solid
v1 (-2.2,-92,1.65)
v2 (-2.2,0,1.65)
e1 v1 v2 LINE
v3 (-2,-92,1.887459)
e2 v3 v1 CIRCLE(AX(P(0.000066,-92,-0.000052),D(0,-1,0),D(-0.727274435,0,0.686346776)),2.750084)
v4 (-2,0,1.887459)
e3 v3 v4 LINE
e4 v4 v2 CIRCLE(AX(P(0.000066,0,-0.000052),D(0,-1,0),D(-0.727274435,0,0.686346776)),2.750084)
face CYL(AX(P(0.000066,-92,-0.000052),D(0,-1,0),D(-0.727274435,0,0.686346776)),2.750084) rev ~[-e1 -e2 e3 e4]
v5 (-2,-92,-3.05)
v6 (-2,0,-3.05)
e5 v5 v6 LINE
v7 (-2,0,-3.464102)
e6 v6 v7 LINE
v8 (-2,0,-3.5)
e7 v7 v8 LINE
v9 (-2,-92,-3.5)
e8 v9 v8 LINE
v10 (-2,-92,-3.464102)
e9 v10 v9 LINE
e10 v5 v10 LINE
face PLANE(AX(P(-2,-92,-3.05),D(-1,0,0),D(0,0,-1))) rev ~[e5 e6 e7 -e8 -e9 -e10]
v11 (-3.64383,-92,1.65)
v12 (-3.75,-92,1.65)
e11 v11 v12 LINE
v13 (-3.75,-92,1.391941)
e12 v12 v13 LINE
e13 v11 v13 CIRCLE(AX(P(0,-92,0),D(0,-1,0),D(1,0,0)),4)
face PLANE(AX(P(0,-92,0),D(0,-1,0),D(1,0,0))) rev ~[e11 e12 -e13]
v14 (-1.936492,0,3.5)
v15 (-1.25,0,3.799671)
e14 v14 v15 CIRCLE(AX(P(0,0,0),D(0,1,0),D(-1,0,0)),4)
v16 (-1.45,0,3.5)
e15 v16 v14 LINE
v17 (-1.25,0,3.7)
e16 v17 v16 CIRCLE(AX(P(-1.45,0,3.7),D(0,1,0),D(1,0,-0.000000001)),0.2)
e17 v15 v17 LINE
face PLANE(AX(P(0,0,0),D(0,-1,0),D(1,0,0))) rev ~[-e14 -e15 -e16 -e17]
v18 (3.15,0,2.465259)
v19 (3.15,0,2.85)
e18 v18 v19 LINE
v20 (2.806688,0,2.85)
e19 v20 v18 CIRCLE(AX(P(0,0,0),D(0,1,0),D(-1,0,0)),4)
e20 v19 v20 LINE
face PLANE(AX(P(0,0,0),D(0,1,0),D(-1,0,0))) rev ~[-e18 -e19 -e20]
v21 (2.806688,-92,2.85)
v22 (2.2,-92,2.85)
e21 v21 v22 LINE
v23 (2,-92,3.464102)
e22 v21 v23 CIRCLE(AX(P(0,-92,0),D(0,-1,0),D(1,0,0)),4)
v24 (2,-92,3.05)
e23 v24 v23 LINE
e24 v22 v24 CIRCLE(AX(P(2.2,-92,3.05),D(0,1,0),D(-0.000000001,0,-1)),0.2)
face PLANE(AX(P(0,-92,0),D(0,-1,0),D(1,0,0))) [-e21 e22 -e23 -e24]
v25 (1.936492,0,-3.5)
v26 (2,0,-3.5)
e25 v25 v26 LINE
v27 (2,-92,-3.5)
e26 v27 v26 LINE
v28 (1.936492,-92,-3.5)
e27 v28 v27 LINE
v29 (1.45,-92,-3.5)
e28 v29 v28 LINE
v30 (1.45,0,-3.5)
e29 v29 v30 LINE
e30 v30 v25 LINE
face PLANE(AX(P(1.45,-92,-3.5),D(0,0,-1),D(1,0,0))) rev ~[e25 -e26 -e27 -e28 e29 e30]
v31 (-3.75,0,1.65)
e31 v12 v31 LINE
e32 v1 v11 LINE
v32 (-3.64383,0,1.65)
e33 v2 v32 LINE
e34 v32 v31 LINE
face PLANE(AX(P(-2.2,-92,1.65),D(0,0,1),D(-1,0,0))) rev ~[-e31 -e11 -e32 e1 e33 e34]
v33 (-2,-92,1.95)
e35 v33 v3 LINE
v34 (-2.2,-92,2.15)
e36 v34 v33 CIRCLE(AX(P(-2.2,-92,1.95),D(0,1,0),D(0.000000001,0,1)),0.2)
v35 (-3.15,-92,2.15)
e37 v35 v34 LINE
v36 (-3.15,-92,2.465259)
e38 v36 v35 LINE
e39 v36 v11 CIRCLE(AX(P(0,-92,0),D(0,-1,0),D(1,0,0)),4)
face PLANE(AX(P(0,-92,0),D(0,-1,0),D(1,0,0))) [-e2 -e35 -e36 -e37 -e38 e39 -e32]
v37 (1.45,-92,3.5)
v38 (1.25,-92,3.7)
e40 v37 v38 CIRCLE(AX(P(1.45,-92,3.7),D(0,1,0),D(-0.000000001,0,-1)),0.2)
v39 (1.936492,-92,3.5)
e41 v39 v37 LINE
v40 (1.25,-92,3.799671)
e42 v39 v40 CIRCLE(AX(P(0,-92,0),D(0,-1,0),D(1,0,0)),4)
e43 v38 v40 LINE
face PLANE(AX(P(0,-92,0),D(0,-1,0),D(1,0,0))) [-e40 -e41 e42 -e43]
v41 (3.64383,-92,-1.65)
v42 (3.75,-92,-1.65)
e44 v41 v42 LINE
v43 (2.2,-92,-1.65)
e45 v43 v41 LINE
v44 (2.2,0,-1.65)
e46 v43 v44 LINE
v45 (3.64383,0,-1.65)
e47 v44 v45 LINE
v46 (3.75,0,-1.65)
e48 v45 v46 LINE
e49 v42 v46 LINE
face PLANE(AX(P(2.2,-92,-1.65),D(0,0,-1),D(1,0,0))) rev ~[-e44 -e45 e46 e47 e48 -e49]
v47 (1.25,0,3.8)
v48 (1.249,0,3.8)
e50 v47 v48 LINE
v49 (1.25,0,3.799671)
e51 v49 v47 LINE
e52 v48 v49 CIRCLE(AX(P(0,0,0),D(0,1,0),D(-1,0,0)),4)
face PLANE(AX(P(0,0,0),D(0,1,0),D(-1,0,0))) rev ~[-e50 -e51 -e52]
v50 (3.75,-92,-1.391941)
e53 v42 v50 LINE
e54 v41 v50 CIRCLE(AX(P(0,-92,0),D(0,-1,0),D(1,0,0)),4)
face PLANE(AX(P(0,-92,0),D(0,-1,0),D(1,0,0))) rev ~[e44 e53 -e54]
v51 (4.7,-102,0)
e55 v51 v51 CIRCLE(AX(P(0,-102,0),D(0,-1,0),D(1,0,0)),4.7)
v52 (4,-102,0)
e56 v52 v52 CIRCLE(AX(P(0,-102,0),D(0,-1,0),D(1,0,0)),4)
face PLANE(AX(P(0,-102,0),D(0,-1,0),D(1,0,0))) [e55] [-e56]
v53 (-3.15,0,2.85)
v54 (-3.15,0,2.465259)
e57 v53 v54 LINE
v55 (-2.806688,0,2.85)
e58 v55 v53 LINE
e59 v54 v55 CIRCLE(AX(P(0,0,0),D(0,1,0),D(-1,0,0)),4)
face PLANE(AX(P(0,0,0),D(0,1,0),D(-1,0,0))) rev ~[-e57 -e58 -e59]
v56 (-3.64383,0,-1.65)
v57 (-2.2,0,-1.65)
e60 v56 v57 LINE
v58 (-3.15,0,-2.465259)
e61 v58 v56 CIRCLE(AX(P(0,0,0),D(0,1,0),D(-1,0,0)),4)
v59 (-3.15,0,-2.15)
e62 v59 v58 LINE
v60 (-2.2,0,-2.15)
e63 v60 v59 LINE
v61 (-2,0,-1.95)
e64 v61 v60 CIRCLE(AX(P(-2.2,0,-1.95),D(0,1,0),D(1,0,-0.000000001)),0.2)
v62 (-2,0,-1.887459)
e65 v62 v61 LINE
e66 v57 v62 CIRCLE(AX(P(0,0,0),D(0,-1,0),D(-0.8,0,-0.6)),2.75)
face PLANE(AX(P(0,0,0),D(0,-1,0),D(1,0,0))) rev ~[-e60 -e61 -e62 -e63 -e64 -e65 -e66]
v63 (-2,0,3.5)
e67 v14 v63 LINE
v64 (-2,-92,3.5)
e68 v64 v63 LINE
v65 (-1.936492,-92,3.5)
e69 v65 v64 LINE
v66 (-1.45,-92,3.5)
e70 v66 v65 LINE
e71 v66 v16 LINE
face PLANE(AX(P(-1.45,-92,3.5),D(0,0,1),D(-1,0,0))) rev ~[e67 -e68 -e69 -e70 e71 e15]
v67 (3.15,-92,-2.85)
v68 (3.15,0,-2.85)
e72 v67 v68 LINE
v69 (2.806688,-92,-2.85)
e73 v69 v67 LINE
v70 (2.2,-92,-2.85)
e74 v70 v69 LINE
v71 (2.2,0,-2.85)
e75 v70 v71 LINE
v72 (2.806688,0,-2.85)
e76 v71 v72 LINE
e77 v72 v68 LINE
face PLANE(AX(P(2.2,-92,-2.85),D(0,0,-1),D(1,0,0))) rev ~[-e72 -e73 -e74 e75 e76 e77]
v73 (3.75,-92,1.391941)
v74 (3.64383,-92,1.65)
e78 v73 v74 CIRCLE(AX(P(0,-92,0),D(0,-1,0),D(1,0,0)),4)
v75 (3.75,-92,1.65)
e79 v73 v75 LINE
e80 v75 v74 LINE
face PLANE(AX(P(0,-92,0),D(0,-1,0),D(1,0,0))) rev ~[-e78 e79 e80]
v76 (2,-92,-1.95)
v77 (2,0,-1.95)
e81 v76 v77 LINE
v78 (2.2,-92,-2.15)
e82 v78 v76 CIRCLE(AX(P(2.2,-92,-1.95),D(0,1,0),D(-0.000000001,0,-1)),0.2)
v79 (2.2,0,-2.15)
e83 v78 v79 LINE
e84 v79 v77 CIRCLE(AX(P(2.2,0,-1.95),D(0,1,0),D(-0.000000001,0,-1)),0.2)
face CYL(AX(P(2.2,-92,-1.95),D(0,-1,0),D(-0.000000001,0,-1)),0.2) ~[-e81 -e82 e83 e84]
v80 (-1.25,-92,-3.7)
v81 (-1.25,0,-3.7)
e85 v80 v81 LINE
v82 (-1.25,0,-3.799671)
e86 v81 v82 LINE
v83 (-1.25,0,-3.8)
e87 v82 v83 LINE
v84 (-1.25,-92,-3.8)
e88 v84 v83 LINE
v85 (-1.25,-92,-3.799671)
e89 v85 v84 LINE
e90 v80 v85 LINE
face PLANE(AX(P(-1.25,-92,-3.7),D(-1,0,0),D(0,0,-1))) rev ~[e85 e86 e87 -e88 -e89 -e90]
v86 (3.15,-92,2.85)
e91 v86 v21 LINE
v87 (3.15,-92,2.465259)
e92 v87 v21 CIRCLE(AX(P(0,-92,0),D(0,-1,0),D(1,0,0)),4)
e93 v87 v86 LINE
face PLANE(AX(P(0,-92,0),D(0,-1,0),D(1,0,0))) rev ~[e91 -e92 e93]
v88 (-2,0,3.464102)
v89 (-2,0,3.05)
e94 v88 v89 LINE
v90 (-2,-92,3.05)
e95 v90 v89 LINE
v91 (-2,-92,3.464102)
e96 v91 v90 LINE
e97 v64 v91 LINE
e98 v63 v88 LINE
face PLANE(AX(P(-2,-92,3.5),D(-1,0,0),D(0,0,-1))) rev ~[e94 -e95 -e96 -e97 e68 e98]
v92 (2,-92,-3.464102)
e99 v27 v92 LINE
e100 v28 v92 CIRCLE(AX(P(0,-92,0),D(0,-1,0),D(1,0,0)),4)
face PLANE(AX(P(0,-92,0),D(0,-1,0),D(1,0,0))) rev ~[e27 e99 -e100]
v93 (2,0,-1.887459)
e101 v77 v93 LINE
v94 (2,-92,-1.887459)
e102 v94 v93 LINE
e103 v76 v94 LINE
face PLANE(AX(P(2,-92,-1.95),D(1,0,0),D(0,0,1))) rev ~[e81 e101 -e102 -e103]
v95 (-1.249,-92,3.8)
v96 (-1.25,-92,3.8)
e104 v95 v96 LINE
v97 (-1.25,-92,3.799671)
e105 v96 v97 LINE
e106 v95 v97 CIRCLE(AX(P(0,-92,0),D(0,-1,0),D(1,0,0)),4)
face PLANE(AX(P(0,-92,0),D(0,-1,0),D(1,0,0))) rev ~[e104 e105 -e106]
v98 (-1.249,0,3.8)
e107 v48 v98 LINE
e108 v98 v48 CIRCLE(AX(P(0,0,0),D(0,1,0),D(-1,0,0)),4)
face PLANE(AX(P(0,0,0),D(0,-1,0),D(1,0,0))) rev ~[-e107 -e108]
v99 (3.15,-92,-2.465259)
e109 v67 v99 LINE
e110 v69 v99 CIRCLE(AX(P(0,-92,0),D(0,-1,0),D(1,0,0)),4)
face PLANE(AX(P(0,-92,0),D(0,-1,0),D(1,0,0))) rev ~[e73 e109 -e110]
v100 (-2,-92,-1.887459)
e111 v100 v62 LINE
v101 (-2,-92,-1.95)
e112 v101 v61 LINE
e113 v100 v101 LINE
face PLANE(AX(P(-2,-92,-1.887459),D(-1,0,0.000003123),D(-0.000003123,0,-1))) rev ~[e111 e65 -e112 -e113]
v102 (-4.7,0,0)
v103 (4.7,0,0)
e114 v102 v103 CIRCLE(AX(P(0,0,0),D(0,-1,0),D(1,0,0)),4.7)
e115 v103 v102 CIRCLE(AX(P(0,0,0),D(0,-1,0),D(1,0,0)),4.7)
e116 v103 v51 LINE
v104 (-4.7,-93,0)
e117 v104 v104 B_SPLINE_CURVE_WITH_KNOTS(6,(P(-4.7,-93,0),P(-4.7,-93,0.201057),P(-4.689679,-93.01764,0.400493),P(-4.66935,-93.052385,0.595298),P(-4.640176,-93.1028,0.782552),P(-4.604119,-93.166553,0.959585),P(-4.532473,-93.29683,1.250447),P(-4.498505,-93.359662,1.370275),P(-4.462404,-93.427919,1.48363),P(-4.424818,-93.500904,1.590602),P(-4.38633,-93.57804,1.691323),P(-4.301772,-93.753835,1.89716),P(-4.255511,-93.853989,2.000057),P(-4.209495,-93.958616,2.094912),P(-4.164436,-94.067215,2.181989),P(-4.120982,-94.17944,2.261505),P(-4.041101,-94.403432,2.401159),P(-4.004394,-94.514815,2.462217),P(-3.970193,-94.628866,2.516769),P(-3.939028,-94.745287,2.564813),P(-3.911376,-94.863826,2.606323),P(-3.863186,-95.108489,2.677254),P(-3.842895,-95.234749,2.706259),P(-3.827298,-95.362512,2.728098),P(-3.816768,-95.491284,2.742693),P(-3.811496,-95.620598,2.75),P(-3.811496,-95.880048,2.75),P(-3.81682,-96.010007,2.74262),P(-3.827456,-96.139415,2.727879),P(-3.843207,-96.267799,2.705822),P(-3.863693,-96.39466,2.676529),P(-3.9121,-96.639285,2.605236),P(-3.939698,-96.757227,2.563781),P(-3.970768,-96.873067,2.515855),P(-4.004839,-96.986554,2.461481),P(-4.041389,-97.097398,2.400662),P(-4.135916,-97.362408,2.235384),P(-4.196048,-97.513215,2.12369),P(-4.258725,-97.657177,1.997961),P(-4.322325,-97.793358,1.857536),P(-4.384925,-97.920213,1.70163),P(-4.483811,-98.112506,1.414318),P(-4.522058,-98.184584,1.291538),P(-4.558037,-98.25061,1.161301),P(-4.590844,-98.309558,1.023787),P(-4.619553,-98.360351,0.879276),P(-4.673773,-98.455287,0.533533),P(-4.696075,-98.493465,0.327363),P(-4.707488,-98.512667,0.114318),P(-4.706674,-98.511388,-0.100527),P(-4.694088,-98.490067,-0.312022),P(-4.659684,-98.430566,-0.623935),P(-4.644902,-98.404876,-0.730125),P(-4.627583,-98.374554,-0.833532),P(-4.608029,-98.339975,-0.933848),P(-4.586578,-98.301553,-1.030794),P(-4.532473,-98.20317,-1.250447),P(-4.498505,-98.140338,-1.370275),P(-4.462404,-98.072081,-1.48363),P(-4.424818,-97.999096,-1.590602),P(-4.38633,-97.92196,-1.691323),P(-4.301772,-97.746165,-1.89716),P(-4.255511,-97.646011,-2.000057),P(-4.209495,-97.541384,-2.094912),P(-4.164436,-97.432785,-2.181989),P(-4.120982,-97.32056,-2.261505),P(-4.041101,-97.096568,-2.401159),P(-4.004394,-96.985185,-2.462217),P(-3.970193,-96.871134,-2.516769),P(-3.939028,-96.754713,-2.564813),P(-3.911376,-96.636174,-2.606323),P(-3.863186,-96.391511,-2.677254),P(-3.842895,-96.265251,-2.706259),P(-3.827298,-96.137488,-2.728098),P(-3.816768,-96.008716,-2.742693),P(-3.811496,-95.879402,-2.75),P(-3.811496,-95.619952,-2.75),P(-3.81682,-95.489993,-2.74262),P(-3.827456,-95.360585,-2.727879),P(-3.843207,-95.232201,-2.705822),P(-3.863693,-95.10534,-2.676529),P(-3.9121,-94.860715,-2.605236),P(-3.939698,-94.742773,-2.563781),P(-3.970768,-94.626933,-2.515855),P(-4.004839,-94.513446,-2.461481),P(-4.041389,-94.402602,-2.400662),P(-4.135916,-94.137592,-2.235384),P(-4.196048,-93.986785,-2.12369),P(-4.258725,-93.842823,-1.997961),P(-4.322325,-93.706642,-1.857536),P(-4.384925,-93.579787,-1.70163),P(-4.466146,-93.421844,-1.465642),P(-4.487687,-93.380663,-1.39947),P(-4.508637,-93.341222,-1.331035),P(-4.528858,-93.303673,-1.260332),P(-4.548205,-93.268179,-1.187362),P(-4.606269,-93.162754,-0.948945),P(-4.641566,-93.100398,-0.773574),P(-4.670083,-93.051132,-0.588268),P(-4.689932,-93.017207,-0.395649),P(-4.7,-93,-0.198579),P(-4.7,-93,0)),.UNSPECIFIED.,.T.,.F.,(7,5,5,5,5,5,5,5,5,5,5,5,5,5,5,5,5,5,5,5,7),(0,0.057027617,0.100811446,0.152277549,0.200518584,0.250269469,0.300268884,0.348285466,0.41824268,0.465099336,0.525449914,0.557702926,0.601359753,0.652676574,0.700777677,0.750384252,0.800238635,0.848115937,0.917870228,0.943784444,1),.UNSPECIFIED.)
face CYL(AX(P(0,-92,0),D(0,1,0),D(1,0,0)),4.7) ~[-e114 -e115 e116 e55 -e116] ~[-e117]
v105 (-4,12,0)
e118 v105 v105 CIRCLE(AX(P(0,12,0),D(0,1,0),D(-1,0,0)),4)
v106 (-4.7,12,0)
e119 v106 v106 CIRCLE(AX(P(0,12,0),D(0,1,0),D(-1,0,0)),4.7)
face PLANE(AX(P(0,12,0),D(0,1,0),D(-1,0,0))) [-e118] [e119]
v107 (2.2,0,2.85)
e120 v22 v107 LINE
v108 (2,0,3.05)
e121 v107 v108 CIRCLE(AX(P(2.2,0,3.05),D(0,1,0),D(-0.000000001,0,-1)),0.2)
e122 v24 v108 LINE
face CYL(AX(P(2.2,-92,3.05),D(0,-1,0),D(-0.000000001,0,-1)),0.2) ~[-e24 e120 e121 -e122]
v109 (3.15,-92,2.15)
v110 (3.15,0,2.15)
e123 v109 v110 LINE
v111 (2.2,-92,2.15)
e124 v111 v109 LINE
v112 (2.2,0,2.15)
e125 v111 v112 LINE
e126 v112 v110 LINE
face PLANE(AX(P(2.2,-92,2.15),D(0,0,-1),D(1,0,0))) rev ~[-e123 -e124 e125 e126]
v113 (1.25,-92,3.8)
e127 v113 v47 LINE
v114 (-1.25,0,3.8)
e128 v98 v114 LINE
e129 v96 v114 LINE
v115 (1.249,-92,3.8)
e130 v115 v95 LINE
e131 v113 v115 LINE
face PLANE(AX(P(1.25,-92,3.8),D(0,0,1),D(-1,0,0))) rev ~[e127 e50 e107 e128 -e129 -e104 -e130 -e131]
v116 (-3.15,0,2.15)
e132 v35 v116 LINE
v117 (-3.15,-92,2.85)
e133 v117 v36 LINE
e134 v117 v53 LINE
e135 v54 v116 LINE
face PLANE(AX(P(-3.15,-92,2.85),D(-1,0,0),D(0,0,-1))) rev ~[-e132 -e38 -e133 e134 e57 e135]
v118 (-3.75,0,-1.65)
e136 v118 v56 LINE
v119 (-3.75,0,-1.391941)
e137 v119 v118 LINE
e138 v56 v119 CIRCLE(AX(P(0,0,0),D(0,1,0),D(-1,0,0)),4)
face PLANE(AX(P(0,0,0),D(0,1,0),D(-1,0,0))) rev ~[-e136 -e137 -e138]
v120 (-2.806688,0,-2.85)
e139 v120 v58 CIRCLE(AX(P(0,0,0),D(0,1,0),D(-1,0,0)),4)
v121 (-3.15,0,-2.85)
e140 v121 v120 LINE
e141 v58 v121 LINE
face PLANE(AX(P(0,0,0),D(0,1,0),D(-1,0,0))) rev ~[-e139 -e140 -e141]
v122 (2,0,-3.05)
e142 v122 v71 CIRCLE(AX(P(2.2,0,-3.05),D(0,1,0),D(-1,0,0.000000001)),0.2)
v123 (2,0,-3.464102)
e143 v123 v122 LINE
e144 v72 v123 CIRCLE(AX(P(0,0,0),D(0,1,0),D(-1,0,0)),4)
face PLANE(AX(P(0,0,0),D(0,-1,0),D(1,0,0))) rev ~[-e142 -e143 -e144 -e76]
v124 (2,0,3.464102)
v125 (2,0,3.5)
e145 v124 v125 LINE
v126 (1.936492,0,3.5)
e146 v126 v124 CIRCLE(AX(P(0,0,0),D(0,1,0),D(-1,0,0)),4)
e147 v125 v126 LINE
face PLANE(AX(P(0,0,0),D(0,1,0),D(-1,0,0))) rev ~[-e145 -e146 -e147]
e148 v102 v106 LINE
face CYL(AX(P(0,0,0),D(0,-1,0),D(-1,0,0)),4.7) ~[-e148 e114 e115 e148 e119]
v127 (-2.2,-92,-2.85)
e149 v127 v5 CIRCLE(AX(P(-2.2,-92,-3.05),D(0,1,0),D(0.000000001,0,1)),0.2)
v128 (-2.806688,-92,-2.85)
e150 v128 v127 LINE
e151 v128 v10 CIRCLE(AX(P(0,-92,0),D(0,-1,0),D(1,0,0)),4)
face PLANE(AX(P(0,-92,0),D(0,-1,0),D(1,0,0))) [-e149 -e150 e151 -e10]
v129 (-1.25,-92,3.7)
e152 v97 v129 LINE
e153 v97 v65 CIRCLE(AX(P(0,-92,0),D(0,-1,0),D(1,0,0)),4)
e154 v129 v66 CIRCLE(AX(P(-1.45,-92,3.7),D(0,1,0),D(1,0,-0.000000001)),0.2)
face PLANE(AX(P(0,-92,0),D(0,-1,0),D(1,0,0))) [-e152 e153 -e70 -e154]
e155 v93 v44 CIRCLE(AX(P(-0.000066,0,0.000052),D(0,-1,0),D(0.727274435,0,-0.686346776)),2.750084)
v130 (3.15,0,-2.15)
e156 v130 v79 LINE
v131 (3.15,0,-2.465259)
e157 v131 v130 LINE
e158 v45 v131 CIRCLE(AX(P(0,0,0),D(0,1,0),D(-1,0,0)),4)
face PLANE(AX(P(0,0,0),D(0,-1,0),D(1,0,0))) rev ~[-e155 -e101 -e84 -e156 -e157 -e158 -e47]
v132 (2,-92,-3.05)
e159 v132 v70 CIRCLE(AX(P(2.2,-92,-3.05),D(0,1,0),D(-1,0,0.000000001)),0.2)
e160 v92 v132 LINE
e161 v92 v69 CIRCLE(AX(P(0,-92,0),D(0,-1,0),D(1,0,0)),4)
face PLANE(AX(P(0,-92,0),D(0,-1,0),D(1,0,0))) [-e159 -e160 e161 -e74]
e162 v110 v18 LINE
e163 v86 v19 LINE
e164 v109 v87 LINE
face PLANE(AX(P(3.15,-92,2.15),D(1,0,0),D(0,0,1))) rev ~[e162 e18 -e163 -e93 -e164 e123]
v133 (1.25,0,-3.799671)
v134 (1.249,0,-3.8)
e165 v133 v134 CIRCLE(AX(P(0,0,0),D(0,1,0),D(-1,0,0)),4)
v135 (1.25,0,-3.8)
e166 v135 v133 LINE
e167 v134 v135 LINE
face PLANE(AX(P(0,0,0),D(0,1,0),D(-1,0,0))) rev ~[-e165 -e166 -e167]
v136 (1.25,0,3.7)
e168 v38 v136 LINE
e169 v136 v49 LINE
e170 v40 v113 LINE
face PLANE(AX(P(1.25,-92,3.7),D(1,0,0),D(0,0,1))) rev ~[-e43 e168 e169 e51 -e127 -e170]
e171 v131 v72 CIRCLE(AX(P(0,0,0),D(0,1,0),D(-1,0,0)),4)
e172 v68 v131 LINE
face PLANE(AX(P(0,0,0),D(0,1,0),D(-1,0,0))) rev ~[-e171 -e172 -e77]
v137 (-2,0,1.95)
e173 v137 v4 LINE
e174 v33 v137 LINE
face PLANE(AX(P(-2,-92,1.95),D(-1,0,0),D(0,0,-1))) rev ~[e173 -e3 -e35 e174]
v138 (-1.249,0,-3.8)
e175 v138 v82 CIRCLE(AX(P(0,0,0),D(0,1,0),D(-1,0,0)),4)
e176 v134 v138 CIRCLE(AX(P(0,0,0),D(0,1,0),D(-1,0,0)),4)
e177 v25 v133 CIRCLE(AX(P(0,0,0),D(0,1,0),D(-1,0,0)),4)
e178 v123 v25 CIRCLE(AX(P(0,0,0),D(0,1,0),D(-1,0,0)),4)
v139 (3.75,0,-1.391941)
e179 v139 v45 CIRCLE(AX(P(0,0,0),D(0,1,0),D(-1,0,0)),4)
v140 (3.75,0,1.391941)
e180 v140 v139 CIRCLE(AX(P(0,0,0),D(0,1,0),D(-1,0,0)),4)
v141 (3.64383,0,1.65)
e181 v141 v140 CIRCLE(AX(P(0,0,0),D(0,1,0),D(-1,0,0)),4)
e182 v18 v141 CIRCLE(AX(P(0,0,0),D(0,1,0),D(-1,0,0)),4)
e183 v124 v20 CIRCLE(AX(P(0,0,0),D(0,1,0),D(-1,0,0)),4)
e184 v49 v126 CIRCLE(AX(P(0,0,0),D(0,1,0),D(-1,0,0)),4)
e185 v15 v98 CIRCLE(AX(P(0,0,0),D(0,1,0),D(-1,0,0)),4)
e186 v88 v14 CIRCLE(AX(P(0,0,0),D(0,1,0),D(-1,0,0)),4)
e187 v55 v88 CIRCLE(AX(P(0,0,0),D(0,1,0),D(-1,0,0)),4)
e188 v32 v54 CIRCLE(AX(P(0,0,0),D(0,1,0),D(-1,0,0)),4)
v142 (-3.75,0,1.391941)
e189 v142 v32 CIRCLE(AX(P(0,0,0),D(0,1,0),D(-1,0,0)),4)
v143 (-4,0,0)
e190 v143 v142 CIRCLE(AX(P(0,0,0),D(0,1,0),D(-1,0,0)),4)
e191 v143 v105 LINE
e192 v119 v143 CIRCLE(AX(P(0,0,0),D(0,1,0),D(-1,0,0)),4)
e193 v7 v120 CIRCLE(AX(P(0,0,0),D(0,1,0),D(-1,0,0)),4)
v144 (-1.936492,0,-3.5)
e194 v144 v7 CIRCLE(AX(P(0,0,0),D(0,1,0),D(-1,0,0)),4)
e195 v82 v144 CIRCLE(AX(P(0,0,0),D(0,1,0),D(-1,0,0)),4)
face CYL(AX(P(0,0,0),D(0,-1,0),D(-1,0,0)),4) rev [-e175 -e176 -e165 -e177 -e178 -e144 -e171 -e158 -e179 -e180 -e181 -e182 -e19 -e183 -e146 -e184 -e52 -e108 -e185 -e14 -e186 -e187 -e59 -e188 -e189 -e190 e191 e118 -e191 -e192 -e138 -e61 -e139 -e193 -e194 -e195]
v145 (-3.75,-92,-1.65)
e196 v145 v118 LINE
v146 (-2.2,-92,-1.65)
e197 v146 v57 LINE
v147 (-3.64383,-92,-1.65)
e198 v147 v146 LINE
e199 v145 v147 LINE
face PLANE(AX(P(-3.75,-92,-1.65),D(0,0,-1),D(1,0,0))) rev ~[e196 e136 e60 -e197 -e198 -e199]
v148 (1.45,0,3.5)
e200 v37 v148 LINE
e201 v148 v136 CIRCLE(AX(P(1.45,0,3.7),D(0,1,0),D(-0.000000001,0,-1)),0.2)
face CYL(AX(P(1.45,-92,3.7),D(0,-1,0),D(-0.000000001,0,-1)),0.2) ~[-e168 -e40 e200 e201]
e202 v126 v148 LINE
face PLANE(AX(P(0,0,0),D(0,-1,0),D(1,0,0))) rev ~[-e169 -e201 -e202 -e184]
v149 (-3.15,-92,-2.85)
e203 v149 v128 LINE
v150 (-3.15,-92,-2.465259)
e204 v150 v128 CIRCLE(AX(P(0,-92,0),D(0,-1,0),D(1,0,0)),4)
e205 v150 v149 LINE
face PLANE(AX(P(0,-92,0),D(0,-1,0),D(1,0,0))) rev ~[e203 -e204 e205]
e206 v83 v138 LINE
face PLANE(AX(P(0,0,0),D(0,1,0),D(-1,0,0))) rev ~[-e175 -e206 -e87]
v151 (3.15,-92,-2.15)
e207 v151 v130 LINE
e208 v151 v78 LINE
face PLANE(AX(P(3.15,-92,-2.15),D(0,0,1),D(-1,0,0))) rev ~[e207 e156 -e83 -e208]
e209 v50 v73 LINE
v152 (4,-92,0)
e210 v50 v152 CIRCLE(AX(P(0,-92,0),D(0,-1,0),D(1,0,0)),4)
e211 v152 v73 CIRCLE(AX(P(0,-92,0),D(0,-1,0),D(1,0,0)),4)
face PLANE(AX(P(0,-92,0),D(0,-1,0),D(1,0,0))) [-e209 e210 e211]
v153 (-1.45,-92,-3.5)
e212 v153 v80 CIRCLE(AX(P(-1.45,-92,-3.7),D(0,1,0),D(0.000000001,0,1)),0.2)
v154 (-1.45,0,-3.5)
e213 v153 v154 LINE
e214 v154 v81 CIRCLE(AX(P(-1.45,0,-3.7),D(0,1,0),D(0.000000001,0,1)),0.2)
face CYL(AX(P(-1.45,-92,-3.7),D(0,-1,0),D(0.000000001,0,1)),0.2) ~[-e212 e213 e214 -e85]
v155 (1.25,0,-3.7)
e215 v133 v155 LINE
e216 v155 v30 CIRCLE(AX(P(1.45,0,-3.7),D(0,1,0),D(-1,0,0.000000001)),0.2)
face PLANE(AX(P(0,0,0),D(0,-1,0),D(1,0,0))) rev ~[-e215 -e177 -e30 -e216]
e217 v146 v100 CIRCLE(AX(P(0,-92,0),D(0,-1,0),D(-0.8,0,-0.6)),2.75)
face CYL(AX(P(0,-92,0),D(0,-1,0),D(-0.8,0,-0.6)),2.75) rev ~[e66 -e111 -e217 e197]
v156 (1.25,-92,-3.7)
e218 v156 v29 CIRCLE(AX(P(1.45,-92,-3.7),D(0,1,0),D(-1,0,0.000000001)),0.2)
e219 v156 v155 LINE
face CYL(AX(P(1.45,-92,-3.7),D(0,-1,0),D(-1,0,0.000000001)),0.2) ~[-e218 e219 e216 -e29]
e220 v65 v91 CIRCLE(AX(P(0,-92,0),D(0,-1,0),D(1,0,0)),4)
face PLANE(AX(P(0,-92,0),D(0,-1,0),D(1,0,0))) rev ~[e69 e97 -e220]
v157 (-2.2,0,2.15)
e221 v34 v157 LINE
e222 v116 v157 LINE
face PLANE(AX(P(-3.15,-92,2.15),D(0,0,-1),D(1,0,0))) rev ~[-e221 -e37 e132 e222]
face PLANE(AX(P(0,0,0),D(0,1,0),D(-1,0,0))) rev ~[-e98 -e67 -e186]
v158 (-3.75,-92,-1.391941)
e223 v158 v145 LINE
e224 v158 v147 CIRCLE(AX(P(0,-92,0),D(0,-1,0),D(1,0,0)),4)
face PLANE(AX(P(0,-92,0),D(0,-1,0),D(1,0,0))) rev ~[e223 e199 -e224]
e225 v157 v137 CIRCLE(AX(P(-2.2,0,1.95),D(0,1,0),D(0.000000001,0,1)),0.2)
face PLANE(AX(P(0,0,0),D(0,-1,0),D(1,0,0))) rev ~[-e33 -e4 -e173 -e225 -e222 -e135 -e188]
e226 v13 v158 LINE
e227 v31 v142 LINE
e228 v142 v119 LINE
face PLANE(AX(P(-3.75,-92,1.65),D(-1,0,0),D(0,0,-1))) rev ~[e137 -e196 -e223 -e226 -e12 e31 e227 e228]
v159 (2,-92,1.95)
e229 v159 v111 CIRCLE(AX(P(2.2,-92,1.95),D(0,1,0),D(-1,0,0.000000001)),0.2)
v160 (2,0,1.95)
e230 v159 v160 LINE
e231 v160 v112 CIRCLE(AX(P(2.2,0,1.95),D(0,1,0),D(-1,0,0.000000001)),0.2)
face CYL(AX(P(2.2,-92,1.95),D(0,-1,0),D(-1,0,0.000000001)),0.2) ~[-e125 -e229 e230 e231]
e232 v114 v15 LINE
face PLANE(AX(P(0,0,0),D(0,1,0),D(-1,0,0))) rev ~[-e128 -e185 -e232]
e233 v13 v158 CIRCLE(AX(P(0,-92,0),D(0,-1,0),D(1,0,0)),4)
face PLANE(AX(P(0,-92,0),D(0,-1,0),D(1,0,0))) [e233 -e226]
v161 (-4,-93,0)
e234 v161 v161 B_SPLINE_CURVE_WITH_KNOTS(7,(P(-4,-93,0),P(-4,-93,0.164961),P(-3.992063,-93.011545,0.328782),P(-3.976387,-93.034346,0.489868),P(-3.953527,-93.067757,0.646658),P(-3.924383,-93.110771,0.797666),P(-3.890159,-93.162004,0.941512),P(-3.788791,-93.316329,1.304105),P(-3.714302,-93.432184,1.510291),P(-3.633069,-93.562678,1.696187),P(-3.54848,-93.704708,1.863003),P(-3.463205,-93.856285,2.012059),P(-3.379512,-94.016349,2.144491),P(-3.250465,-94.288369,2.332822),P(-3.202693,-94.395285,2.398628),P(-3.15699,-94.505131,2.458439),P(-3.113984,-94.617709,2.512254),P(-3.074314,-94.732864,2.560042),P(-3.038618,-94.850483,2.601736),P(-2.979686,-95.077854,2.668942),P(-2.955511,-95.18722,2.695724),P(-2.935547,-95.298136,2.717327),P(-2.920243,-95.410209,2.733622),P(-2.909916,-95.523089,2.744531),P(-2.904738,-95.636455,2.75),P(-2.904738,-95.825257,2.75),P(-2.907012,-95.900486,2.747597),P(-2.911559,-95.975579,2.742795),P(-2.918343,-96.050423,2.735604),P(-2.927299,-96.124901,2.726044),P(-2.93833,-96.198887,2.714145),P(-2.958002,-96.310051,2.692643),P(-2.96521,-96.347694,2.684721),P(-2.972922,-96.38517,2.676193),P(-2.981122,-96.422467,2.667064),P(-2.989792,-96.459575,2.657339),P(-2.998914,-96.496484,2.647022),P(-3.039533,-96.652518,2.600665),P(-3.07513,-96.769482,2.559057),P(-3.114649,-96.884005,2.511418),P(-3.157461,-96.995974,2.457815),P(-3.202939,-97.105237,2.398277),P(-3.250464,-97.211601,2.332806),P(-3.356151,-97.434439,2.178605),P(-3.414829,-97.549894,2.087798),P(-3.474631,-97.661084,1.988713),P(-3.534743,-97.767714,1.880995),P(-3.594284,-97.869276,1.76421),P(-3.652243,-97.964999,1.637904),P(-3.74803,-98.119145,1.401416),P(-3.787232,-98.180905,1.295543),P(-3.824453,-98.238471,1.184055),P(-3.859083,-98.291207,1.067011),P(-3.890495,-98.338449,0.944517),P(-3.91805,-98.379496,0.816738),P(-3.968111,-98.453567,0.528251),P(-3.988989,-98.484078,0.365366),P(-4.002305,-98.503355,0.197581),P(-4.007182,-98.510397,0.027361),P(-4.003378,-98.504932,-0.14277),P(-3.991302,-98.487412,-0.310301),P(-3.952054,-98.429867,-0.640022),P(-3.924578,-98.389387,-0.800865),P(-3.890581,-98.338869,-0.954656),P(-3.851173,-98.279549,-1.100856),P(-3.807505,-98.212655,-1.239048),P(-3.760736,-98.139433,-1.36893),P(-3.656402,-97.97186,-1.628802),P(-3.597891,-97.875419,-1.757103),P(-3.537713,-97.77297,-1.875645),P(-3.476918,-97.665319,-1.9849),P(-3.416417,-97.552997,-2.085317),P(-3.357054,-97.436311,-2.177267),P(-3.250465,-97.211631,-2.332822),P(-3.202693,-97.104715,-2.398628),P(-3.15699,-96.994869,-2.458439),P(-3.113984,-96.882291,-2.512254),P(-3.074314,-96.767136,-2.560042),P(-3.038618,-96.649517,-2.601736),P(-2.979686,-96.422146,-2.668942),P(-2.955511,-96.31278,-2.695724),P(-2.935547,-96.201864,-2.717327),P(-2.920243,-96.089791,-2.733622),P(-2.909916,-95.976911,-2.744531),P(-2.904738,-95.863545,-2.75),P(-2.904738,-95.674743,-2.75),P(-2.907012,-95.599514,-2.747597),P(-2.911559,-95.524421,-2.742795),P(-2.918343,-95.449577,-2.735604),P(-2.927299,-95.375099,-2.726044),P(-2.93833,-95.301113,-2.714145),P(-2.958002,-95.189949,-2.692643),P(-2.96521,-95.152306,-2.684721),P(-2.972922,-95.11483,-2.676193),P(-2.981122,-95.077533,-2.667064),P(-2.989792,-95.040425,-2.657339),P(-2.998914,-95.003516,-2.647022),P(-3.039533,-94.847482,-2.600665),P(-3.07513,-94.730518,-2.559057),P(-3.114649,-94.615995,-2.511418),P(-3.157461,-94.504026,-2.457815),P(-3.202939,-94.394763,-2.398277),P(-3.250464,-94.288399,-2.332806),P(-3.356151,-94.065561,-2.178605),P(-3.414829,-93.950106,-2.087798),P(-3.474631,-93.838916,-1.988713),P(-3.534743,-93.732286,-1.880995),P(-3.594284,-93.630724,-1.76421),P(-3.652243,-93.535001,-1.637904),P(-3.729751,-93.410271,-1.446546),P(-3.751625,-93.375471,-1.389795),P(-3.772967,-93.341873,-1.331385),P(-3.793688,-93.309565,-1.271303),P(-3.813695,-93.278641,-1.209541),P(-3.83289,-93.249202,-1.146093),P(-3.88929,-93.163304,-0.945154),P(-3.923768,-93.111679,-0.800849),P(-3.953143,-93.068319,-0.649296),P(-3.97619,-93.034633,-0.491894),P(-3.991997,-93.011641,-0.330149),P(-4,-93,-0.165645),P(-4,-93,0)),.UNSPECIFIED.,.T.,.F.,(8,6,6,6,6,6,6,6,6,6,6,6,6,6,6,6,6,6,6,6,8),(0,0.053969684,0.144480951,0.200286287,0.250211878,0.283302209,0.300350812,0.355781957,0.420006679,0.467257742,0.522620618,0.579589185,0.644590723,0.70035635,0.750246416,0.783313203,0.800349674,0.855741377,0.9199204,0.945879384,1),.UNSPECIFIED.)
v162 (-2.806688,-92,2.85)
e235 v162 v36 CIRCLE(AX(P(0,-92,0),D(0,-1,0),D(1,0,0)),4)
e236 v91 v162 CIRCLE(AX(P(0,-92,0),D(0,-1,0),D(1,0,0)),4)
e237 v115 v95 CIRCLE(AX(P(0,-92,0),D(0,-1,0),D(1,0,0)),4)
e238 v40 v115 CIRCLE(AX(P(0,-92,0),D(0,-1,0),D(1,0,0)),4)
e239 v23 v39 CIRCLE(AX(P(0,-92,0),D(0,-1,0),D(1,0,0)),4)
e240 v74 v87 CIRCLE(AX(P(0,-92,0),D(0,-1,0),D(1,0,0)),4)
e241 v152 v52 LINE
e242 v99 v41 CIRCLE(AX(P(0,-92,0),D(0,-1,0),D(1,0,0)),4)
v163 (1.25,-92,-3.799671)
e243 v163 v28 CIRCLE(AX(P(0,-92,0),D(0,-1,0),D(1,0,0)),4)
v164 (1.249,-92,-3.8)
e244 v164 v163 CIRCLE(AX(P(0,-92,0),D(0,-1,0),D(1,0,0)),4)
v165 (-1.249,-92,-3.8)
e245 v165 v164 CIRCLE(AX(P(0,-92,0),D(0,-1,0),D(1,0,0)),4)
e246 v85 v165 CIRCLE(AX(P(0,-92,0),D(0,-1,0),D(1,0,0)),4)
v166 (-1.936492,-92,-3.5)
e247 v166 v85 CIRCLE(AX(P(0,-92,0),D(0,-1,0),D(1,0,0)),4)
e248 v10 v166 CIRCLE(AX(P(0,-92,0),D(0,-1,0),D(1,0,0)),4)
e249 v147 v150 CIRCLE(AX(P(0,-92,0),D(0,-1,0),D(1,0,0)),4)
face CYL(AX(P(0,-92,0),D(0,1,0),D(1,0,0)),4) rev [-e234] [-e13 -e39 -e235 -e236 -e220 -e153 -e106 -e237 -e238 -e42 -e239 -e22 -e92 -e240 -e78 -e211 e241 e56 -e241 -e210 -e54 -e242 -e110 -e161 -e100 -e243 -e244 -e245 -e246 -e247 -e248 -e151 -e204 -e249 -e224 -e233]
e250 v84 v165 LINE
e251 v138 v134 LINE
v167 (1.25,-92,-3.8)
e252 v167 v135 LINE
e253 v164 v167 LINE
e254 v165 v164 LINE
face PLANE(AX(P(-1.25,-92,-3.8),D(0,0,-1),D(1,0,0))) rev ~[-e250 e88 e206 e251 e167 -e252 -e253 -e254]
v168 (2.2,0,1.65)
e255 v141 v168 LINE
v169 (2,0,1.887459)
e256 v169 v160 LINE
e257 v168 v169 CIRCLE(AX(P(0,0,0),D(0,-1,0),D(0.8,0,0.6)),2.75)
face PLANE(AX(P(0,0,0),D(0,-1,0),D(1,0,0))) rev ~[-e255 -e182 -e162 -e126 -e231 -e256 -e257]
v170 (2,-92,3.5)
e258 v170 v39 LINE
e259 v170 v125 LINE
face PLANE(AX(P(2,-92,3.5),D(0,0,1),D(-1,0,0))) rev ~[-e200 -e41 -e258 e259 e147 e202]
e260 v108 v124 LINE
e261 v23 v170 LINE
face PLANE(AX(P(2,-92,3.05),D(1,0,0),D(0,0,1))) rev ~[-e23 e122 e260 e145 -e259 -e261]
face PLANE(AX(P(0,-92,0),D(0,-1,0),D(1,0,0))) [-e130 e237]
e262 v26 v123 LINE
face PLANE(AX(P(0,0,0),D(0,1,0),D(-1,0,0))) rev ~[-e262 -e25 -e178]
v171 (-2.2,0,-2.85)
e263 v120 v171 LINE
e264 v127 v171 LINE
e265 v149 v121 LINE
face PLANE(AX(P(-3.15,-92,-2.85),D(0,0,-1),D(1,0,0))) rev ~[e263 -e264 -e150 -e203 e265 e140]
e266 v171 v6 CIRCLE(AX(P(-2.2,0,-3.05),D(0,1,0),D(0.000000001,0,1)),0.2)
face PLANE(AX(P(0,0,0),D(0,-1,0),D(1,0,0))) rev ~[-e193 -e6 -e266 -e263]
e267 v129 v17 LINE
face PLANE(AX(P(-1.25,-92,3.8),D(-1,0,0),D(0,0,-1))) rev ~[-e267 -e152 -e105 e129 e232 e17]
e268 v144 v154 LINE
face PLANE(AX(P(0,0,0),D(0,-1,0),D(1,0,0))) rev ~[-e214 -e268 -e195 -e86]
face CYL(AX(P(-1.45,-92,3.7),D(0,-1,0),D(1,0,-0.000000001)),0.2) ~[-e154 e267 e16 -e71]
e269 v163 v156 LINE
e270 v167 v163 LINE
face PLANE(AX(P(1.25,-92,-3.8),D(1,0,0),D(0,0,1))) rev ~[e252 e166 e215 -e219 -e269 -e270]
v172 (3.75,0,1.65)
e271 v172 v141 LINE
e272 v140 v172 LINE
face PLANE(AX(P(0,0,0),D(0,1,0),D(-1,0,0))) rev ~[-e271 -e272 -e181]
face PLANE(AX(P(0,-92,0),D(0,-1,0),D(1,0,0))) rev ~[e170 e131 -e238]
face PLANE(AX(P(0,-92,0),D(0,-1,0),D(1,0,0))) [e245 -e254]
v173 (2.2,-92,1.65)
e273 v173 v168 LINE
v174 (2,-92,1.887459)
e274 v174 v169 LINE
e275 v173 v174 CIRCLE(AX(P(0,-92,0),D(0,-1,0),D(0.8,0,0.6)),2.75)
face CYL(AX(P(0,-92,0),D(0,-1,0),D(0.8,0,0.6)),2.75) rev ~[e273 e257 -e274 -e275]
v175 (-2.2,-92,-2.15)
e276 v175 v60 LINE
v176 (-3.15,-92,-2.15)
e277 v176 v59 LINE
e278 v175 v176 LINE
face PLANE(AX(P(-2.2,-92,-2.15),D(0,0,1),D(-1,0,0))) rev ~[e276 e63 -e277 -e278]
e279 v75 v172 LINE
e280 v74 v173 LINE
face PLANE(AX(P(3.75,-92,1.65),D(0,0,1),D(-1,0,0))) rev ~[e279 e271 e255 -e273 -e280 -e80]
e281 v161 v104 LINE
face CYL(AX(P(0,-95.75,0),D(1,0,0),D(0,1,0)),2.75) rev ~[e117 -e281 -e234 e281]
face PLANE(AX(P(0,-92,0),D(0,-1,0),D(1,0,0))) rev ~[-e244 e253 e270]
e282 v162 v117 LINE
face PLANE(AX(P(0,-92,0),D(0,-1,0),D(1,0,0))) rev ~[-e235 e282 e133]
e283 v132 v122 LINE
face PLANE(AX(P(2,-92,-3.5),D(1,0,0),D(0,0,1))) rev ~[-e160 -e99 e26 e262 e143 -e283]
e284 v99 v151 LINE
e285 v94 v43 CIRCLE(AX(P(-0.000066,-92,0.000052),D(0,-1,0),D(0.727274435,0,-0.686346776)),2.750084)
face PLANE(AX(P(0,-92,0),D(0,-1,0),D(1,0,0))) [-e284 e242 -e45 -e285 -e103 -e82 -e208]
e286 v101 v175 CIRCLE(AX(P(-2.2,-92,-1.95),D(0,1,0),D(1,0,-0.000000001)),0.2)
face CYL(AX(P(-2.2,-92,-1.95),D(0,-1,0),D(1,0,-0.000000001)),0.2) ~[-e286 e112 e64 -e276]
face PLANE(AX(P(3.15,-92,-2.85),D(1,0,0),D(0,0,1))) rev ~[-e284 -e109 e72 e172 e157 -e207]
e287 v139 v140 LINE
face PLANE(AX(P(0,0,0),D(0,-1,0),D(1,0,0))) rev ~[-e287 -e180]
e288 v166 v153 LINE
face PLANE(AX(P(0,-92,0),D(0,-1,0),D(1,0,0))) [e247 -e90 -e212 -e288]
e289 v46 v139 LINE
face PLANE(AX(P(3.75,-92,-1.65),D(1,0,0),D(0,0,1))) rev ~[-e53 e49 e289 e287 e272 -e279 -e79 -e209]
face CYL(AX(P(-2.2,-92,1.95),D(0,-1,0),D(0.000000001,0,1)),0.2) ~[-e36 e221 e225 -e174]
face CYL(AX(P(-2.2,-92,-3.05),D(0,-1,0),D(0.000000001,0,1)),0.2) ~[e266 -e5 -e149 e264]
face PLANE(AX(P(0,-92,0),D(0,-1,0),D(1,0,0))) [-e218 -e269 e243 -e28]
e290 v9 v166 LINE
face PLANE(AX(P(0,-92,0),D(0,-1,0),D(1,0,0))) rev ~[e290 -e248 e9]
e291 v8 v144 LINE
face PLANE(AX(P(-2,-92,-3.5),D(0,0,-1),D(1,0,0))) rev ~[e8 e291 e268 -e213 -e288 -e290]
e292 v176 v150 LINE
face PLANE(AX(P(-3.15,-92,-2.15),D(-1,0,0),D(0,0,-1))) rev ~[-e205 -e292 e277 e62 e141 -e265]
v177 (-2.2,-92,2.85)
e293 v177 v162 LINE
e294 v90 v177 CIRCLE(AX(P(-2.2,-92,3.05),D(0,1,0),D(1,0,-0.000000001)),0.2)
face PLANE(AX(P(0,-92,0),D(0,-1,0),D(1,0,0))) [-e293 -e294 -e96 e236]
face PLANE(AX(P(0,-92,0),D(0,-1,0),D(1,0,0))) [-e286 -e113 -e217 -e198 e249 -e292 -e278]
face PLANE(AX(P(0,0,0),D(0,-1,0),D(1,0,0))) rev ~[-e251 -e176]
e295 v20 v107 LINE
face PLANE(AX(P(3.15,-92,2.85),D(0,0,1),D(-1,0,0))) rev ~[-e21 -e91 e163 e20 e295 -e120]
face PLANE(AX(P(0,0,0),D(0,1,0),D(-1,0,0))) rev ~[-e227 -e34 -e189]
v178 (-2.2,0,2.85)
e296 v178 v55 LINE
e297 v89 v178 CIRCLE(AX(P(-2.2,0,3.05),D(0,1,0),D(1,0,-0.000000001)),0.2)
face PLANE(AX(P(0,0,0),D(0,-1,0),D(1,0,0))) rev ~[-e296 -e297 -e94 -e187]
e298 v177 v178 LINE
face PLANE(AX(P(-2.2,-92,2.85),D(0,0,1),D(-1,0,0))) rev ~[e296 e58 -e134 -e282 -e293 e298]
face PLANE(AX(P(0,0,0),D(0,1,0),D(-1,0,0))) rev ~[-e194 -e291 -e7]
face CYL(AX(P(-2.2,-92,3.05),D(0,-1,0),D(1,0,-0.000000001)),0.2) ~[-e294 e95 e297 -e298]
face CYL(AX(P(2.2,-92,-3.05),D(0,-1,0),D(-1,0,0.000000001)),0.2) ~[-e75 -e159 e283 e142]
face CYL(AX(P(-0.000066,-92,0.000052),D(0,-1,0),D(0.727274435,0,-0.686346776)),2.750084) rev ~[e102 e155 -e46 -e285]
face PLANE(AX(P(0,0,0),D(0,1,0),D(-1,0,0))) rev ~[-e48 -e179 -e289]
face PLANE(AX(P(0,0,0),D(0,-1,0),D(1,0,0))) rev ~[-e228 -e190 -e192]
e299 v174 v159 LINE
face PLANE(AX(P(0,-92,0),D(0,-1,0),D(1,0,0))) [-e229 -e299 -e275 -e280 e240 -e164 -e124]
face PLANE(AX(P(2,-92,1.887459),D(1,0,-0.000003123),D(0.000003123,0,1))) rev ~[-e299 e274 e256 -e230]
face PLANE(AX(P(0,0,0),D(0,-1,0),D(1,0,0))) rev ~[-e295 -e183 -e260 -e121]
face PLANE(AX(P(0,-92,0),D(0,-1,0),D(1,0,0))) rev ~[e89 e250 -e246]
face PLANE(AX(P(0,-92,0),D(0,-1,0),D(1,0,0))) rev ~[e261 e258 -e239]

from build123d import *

# Parameters (mm, degrees)
F3_R      = 4.7
F4_DEPTH  = 92
F8_DEPTH  = 92
F6_R      = 4.7
F6_R_2    = 4
F9_DEPTH  = 10
F7_R      = 4.7
F7_R_2    = 4
F10_DEPTH = 12
F11_R     = 2.75
F12_DEPTH = 4.701


# Not quite as in the source:
# - ends of sketch curves that miss each other by under 0.0002 mm in the source are joined


with BuildPart() as f4:
    # F3 (on Front) → F4 (new body)
    with BuildSketch(Plane.XZ):
        Circle(F3_R)
    extrude(amount=F4_DEPTH)

    # F5 (on face) → F8 (cut, through all)
    with BuildSketch(Plane.XZ.offset(92)):
        with BuildLine():
            Line((-1.25, -3.8), (0, -3.8))
            Line((0, -3.8), (1.25, -3.8))
            Line((1.25, -3.8), (1.25, -3.7))
            ThreePointArc((1.25, -3.7), (1.3085786438, -3.5585786438), (1.45, -3.5))
            Line((1.45, -3.5), (2, -3.5))
            Line((2, -3.5), (2, -3.05))
            ThreePointArc((2, -3.05), (2.0585786438, -2.9085786438), (2.2, -2.85))
            Line((2.2, -2.85), (3.15, -2.85))
            Line((3.15, -2.85), (3.15, -2.15))
            Line((3.15, -2.15), (2.2, -2.15))
            ThreePointArc((2.2, -2.15), (2.0585786438, -2.0914213562), (2, -1.95))
            Line((2, -1.95), (2, -1.887459))
            ThreePointArc((2, -1.887459), (2.1033535752, -1.771554046), (2.2, -1.65))
            Line((2.2, -1.65), (3.75, -1.65))
            Line((3.75, -1.65), (3.75, 0))
            Line((3.75, 0), (3.75, 1.65))
            Line((3.75, 1.65), (2.2, 1.65))
            ThreePointArc((2.2, 1.65), (2.1033535752, 1.771554046), (1.9999998047, 1.8874588157))
            Line((1.9999998047, 1.8874588157), (2, 1.95))
            ThreePointArc((2, 1.95), (2.0585786438, 2.0914213562), (2.2, 2.15))
            Line((2.2, 2.15), (3.15, 2.15))
            Line((3.15, 2.15), (3.15, 2.85))
            Line((3.15, 2.85), (2.2, 2.85))
            ThreePointArc((2.2, 2.85), (2.0585786438, 2.9085786438), (2, 3.05))
            Line((2, 3.05), (2, 3.5))
            Line((2, 3.5), (1.45, 3.5))
            ThreePointArc((1.45, 3.5), (1.3085786438, 3.5585786438), (1.25, 3.7))
            Line((1.25, 3.7), (1.25, 3.8))
            Line((1.25, 3.8), (0, 3.8))
            Line((0, 3.8), (-1.25, 3.8))
            Line((-1.25, 3.8), (-1.25, 3.7))
            ThreePointArc((-1.25, 3.7), (-1.3085786438, 3.5585786438), (-1.45, 3.5))
            Line((-1.45, 3.5), (-2, 3.5))
            Line((-2, 3.5), (-2, 3.05))
            ThreePointArc((-2, 3.05), (-2.0585786438, 2.9085786438), (-2.2, 2.85))
            Line((-2.2, 2.85), (-3.15, 2.85))
            Line((-3.15, 2.85), (-3.15, 2.15))
            Line((-3.15, 2.15), (-2.2, 2.15))
            ThreePointArc((-2.2, 2.15), (-2.0585786438, 2.0914213562), (-2, 1.95))
            Line((-2, 1.95), (-2, 1.887459))
            ThreePointArc((-2, 1.887459), (-2.1033535752, 1.771554046), (-2.2, 1.65))
            Line((-2.2, 1.65), (-3.75, 1.65))
            Line((-3.75, 1.65), (-3.75, 0))
            Line((-3.75, 0), (-3.75, -1.65))
            Line((-3.75, -1.65), (-2.2, -1.65))
            ThreePointArc((-2.2, -1.65), (-2.1033535752, -1.771554046), (-1.9999998047, -1.8874588157))
            Line((-1.9999998047, -1.8874588157), (-2, -1.95))
            ThreePointArc((-2, -1.95), (-2.0585786438, -2.0914213562), (-2.2, -2.15))
            Line((-2.2, -2.15), (-3.15, -2.15))
            Line((-3.15, -2.15), (-3.15, -2.85))
            Line((-3.15, -2.85), (-2.2, -2.85))
            ThreePointArc((-2.2, -2.85), (-2.0585786438, -2.9085786438), (-2, -3.05))
            Line((-2, -3.05), (-2, -3.5))
            Line((-2, -3.5), (-1.45, -3.5))
            ThreePointArc((-1.45, -3.5), (-1.3085786438, -3.5585786438), (-1.25, -3.7))
            Line((-1.25, -3.7), (-1.25, -3.8))
        make_face()
    extrude(amount=-F8_DEPTH, mode=Mode.SUBTRACT)

    # F6 (on face) → F9 (join)
    with BuildSketch(Plane.XZ.offset(92)):
        Circle(F6_R)
        Circle(F6_R_2, mode=Mode.SUBTRACT)
    extrude(amount=F9_DEPTH)

    # F7 (on face) → F10 (join)
    with BuildSketch(Plane(origin=(0, 0, 0), x_dir=(-1, 0, 0), z_dir=(0, 1, 0))):
        Circle(F7_R)
        Circle(F7_R_2, mode=Mode.SUBTRACT)
    extrude(amount=F10_DEPTH)

    # F11 (on Right) → F12 (cut, through all)
    with BuildSketch(Plane.YZ):
        with Locations((-95.75, 0)):
            Circle(F11_R)
    extrude(amount=-F12_DEPTH, mode=Mode.SUBTRACT)


solid = f4.part
